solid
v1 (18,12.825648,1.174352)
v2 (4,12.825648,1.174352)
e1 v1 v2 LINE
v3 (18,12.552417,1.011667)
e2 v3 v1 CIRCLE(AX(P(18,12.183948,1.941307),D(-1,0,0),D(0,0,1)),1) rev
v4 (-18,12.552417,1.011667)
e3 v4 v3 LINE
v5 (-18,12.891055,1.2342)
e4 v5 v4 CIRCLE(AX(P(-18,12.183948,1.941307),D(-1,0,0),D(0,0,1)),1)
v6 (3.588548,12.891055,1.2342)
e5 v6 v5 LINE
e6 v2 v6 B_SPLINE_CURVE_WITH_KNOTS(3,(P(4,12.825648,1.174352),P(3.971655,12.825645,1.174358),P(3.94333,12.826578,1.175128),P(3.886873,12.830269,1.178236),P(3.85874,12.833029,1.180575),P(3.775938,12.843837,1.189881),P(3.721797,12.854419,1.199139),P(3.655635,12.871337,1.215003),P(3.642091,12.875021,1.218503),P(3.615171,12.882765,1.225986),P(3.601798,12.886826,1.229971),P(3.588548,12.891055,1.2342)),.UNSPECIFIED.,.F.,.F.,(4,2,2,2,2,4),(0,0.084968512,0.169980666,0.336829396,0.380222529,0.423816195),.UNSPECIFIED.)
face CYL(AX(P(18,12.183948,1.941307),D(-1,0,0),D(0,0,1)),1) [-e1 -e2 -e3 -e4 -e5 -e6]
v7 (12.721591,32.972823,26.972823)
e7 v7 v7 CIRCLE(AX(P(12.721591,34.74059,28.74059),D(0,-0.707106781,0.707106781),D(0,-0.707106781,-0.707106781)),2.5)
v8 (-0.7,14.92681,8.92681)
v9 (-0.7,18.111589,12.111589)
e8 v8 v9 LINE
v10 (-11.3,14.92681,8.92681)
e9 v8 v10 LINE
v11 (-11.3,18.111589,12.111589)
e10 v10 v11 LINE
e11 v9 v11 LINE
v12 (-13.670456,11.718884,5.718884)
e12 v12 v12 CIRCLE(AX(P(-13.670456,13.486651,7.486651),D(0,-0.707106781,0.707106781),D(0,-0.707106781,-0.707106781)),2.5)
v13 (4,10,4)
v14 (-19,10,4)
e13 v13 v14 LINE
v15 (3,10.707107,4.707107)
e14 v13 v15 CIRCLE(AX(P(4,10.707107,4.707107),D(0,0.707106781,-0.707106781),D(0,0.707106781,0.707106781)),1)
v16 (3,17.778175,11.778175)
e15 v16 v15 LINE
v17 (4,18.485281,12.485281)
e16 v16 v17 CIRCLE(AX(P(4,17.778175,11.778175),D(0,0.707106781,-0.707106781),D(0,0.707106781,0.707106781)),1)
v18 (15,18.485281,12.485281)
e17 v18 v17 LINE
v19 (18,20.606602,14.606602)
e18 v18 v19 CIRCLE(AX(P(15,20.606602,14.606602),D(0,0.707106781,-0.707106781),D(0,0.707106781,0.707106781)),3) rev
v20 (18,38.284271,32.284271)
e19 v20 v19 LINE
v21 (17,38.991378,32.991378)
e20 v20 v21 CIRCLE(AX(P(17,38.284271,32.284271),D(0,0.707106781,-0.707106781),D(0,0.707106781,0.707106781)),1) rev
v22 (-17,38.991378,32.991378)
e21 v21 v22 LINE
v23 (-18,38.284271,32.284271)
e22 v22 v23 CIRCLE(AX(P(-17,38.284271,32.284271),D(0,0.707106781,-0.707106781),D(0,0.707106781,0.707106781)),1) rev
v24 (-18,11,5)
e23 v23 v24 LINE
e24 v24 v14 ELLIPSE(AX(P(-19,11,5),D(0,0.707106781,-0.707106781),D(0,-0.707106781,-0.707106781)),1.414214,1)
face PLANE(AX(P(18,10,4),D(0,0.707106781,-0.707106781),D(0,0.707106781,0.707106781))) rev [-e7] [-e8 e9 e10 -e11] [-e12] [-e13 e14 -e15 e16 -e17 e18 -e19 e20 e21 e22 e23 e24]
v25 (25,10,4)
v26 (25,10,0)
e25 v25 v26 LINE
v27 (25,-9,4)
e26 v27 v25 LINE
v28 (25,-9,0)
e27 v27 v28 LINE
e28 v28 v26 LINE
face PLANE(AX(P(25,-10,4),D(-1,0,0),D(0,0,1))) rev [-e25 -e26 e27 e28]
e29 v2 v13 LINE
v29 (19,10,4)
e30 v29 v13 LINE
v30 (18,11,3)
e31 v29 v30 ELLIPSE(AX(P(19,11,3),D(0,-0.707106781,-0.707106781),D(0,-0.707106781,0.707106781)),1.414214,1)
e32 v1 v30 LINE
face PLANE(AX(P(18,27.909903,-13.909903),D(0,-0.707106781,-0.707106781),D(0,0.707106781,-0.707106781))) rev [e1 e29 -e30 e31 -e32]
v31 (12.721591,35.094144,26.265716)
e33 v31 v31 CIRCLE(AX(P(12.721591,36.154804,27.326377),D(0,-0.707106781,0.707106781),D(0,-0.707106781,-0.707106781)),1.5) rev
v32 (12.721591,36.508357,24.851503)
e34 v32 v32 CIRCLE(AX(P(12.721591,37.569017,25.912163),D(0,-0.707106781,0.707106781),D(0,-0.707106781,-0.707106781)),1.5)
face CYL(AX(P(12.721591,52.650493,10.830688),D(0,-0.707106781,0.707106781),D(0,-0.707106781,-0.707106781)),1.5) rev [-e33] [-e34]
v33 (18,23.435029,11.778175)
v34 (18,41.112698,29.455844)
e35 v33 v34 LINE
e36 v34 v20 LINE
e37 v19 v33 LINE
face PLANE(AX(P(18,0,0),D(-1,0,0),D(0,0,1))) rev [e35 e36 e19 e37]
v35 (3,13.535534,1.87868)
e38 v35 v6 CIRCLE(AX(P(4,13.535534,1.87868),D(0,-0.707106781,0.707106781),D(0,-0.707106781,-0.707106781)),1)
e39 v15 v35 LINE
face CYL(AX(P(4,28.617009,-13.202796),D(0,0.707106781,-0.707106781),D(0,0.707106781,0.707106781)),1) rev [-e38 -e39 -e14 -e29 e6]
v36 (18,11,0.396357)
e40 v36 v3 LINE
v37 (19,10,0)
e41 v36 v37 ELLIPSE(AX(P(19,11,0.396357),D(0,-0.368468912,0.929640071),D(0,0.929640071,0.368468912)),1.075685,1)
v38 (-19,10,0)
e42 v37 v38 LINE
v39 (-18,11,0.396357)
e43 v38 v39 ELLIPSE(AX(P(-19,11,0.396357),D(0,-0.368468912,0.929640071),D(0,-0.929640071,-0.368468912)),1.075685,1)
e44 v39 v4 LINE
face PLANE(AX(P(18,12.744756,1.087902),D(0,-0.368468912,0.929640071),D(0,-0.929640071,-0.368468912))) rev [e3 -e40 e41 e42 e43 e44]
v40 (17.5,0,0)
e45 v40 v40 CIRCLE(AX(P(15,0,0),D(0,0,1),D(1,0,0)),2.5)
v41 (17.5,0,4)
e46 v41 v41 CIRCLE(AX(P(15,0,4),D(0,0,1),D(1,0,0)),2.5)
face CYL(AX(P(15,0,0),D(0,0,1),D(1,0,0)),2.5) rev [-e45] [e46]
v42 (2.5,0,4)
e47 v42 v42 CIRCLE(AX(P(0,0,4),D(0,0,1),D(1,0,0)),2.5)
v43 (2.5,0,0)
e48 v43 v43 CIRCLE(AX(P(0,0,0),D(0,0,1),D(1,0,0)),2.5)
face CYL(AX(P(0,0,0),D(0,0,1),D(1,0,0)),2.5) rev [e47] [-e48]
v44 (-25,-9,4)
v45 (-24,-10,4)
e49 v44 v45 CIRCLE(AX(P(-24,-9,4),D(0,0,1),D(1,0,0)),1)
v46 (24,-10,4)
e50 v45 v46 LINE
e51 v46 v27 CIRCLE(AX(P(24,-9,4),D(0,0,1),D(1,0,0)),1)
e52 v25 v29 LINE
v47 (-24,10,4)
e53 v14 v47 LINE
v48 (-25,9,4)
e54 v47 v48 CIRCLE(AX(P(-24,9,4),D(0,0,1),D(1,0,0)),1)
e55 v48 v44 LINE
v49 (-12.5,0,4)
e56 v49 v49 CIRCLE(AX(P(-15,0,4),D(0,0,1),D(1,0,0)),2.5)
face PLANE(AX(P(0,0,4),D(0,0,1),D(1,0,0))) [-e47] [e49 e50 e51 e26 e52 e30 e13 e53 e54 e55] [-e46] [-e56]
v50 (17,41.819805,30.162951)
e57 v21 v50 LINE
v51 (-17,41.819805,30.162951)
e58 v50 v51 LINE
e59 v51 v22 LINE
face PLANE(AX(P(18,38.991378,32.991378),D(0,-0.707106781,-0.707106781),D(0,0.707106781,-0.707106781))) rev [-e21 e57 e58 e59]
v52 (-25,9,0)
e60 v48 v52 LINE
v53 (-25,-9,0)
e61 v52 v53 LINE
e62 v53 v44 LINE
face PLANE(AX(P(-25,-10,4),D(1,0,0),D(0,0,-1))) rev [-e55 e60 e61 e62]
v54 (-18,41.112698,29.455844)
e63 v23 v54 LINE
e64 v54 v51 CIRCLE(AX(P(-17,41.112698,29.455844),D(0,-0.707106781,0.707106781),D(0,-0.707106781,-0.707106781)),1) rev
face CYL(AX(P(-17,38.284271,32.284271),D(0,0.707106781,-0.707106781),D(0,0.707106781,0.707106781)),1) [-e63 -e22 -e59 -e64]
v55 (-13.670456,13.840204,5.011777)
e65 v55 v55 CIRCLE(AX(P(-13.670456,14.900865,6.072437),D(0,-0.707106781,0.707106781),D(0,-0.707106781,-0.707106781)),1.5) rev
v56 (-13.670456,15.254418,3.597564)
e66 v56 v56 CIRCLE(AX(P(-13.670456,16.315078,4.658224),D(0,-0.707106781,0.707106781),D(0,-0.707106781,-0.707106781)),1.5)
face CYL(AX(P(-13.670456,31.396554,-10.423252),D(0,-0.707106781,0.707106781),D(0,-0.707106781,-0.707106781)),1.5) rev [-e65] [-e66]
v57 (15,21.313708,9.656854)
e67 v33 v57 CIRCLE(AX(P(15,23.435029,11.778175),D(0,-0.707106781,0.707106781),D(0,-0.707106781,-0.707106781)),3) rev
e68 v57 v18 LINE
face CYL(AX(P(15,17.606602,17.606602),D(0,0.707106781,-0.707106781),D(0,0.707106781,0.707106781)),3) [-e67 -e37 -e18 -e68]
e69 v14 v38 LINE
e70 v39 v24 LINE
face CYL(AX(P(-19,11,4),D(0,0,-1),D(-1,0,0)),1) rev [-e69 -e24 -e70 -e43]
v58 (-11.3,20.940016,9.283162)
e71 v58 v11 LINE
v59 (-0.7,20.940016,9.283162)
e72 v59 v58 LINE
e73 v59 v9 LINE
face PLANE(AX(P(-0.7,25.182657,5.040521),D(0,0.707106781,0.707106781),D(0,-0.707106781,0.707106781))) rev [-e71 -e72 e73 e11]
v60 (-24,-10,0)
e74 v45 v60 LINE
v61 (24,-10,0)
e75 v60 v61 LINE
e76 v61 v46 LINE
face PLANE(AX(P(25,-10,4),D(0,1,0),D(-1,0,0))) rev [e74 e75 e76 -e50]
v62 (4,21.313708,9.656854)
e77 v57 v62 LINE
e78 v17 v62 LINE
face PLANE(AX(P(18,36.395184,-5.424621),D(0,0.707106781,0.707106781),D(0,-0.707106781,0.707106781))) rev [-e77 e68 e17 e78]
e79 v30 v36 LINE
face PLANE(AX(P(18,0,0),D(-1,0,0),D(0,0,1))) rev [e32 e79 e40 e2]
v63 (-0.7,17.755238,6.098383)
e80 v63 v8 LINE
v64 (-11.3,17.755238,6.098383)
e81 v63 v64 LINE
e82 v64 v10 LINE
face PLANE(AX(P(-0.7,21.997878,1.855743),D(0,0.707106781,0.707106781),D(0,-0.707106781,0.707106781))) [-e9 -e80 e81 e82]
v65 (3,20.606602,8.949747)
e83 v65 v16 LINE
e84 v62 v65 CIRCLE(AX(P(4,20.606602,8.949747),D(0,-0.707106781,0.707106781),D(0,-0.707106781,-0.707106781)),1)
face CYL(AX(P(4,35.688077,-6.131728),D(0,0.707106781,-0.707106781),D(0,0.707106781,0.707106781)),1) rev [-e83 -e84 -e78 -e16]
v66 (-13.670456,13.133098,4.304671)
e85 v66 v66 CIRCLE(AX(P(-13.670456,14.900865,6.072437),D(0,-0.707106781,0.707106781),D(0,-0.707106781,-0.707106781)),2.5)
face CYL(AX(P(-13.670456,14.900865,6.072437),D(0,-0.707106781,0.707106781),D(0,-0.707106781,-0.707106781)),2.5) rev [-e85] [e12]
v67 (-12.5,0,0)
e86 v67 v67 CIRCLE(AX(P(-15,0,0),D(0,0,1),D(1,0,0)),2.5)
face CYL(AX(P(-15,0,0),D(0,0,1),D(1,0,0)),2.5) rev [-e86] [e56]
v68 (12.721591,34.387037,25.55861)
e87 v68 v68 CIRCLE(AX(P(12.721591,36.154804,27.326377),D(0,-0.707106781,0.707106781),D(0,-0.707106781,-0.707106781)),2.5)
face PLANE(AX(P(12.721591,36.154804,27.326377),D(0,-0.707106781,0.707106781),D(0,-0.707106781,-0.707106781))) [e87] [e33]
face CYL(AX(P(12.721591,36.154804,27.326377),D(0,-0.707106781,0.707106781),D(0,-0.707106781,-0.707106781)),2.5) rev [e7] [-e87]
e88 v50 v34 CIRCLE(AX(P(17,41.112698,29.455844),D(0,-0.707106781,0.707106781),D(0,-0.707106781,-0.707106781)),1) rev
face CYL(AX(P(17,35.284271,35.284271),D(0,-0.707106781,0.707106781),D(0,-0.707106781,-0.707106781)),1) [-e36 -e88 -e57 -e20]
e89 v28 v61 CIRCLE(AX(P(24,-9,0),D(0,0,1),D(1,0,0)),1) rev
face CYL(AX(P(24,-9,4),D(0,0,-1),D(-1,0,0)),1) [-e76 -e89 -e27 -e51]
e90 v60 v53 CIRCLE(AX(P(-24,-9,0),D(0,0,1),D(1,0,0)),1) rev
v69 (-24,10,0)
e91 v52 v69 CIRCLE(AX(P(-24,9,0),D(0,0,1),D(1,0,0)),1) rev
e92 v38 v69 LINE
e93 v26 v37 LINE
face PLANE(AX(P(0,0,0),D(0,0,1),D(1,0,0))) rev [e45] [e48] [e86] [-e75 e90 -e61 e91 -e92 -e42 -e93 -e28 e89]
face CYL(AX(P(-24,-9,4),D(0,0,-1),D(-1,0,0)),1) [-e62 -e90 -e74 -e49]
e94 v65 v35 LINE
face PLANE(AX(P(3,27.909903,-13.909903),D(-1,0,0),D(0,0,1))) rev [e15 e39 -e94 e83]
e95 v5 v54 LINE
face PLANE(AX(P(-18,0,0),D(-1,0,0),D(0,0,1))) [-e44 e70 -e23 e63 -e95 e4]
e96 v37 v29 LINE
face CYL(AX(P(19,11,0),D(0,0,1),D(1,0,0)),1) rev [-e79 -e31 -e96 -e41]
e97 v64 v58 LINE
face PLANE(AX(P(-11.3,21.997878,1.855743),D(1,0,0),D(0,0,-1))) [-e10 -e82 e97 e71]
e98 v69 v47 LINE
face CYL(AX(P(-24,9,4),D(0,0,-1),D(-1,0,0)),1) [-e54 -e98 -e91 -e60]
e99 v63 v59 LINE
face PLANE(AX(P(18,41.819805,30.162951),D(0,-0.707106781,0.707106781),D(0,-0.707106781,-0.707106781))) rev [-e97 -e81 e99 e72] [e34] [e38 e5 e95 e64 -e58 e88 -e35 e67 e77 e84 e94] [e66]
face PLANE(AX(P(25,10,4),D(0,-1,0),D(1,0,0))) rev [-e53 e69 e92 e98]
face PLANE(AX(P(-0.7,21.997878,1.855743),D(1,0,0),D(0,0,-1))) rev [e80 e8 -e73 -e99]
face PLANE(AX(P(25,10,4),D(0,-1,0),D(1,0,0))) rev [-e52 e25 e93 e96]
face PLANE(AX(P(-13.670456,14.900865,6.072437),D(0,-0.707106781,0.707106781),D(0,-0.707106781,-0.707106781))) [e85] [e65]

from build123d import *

# Parameters (mm, degrees)
SKETCH_1_W          = 50
SKETCH_1_H          = 20
EXTRUDE_1_DEPTH     = 4
EXTRUDE_2_DEPTH     = 18
SKETCH_5_R          = 1.5
CUT_EXTRUDE_1_DEPTH = 59.543629581
SKETCH_6_W          = 15
SKETCH_6_H          = 12
CUT_EXTRUDE_2_DEPTH = 59.543629581
FILLET_1_R          = 1
FILLET_2_R          = 1
FILLET_3_R          = 1
SKETCH_7_R          = 2.5
CUT_EXTRUDE_3_DEPTH = 2
SKETCH_8_R          = 2.5
CUT_EXTRUDE_4_DEPTH = 57.695644481
SKETCH_9_W          = 10.6
SKETCH_9_H          = 4.503957044
CUT_EXTRUDE_5_DEPTH = 10
FILLET_4_R          = 3


with BuildPart() as part:
    # 草图1 → 凸台-拉伸1 (new body)
    with BuildSketch(Plane.XY):
        Rectangle(SKETCH_1_W, SKETCH_1_H)
    extrude(amount=EXTRUDE_1_DEPTH)

    # 草图4 → 凸台-拉伸2 (add, symmetric)
    with BuildSketch(Plane(origin=(0, 0, 0), x_dir=(0, 0, -1), z_dir=(1, 0, 0))):
        Polygon((-4, 10), (-32.991378029, 38.991378029), (-30.162950904, 41.819805153), (-1.087902103, 12.744756352), (0, 10), align=None)
    extrude(amount=EXTRUDE_2_DEPTH, both=True)

    # 草图5 → 切除-拉伸1 (cut, through all)
    with BuildSketch(Plane(origin=(0, 3, -3), x_dir=(1, 0, 0), z_dir=(0, -0.7071067811865488, 0.7071067811865462))):
        with Locations(Location((12.721590614, 44.887973136, 0), (0, 0, 270))):
            Circle(SKETCH_5_R)
        with Locations(Location((-13.670456314, 14.830364134, 0), (0, 0, 270))):
            Circle(SKETCH_5_R)
    extrude(amount=-CUT_EXTRUDE_1_DEPTH, mode=Mode.SUBTRACT)

    # 草图6 → 切除-拉伸2 (cut, through all)
    with BuildSketch(Plane(origin=(0, 3, -3), x_dir=(1, 0, 0), z_dir=(0, -0.7071067811865488, 0.7071067811865462))):
        with Locations((10.5, 15.899494937)):
            Rectangle(SKETCH_6_W, SKETCH_6_H)
    extrude(amount=-CUT_EXTRUDE_2_DEPTH, mode=Mode.SUBTRACT)

    # 圆角1
    fillet_1_edges = [part.edges().sort_by_distance(p)[0] for p in [
        (3, 11.414213562, 2.585786438),
        (3, 19.899494937, 11.071067812),
    ]]
    fillet(fillet_1_edges, radius=FILLET_1_R)

    # 圆角2
    # the kernel refuses this fillet: 1 mm, written as the material it adds along each edge
    with BuildSketch(Plane(origin=(-18, 10, 0), x_dir=(0, 1, 0), z_dir=(0, 0, 1))) as fillet_2_piece_1_section:
        with BuildLine():
            CenterArc((FILLET_2_R, FILLET_2_R), FILLET_2_R, 180, 90)
            Line((0, FILLET_2_R), (0, 0))
            Line((0, 0), (FILLET_2_R, 0))
        make_face()
    fillet_2_piece_1 = extrude(amount=4, mode=Mode.PRIVATE)
    fillet_2_piece_1 = split(fillet_2_piece_1, bisect_by=Plane(origin=(-18.229103678, 9.132725648, 3.132725648), z_dir=(0, 0.7071067811865489, -0.7071067811865462)), keep=Keep.TOP, mode=Mode.PRIVATE)
    fillet_2_piece_1 = split(fillet_2_piece_1, bisect_by=Plane(origin=(-18.229103678, 10.891700331, 0.353431249), z_dir=(0, -0.36846891223412287, 0.9296400705203075)), keep=Keep.TOP, mode=Mode.PRIVATE)
    add(fillet_2_piece_1)
    with BuildSketch(Plane(origin=(-18, 10, 0), x_dir=(0, 1, 0), z_dir=(0, 0, 1))) as fillet_2_piece_2_section:
        with BuildLine():
            CenterArc((FILLET_2_R, FILLET_2_R), FILLET_2_R, 180, 90)
            Line((0, FILLET_2_R), (0, 0))
            Line((0, 0), (FILLET_2_R, 0))
        make_face()
    fillet_2_piece_2 = extrude(amount=6.5, mode=Mode.PRIVATE)
    fillet_2_piece_2 = split(fillet_2_piece_2, bisect_by=Plane(origin=(-18.106472513, 10.430118052, 4), z_dir=(0, 0, 1)), keep=Keep.TOP, mode=Mode.PRIVATE)
    fillet_2_piece_2 = split(fillet_2_piece_2, bisect_by=Plane(origin=(-18.106472513, 10.322588538, 4.322588538), z_dir=(0, 0.7071067811865489, -0.7071067811865462)), keep=Keep.TOP, mode=Mode.PRIVATE)
    add(fillet_2_piece_2)
    with BuildSketch(Plane(origin=(18, 10, 0), x_dir=(0, 1, 0), z_dir=(0, 0, 1))) as fillet_2_piece_3_section:
        with BuildLine():
            CenterArc((FILLET_2_R, -FILLET_2_R), FILLET_2_R, 90, 90)
            Line((0, -FILLET_2_R), (0, 0))
            Line((0, 0), (FILLET_2_R, 0))
        make_face()
    fillet_2_piece_3 = extrude(amount=4, mode=Mode.PRIVATE)
    fillet_2_piece_3 = split(fillet_2_piece_3, bisect_by=Plane(origin=(18.236725667, 10.843896017, 0.334483697), z_dir=(0, -0.36846891223412287, 0.9296400705203075)), keep=Keep.TOP, mode=Mode.PRIVATE)
    fillet_2_piece_3 = split(fillet_2_piece_3, bisect_by=Plane(origin=(18.236725667, 11.136071068, 2.863928932), z_dir=(0, -0.7071067811865462, -0.7071067811865489)), keep=Keep.TOP, mode=Mode.PRIVATE)
    add(fillet_2_piece_3)
    # the kernel refuses this fillet: 1 mm, written as the material it takes off along each edge
    with BuildSketch(Plane(origin=(-18, 37.223611076, 34.759144982), x_dir=(1, 0, 0), z_dir=(0, 0.7071067811865485, -0.7071067811865467)), Plane(origin=(18, 37.223611076, 34.759144982), x_dir=(0, -0.7071067811865467, -0.7071067811865485), z_dir=(0, 0.7071067811865485, -0.7071067811865467))) as fillet_2_2_piece_1:
        with BuildLine():
            CenterArc((FILLET_2_R, FILLET_2_R), FILLET_2_R, 180, 90)
            Line((0, FILLET_2_R), (0, 0))
            Line((0, 0), (FILLET_2_R, 0))
        make_face()
    extrude(amount=9, mode=Mode.SUBTRACT)
    with BuildSketch(Plane(origin=(-25, 10, -2.5), x_dir=(1, 0, 0), z_dir=(0, 0, 1)), Plane(origin=(25, -10, -2.5), x_dir=(-1, 0, 0), z_dir=(0, 0, 1)), Plane(origin=(-25, -10, -2.5), x_dir=(0, 1, 0), z_dir=(0, 0, 1))) as fillet_2_2_piece_2:
        with BuildLine():
            CenterArc((FILLET_2_R, -FILLET_2_R), FILLET_2_R, 90, 90)
            Line((0, -FILLET_2_R), (0, 0))
            Line((0, 0), (FILLET_2_R, 0))
        make_face()
    extrude(amount=9, mode=Mode.SUBTRACT)

    # 圆角3
    fillet_3_edges = [part.edges().sort_by_distance(p)[0] for p in [
        (0, 12.744756352, 1.087902103),
    ]]
    fillet(fillet_3_edges, radius=FILLET_3_R)

    # 草图7 → 切除-拉伸3 (cut)
    with BuildSketch(Plane(origin=(0, 3, -3), x_dir=(1, 0, 0), z_dir=(0, -0.7071067811865488, 0.7071067811865462))):
        with Locations(Location((12.721590614, 44.887973136, 0), (0, 0, 270))):
            Circle(SKETCH_7_R)
        with Locations(Location((-13.670456314, 14.830364134, 0), (0, 0, 270))):
            Circle(SKETCH_7_R)
    extrude(amount=-CUT_EXTRUDE_3_DEPTH, mode=Mode.SUBTRACT)

    # 草图8 → 切除-拉伸4 (cut, through all)
    with BuildSketch(Plane.XY.offset(4)):
        Circle(SKETCH_8_R)
        with Locations((15, 0)):
            Circle(SKETCH_8_R)
        with Locations((-15, 0)):
            Circle(SKETCH_8_R)
    extrude(amount=-CUT_EXTRUDE_4_DEPTH, mode=Mode.SUBTRACT)

    # 草图9 → 切除-拉伸5 (cut)
    with BuildSketch(Plane(origin=(0, 3, -3), x_dir=(1, 0, 0), z_dir=(0, -0.7071067811865488, 0.7071067811865462))):
        with Locations((-6, 19.119035577)):
            Rectangle(SKETCH_9_W, SKETCH_9_H)
    extrude(amount=-CUT_EXTRUDE_5_DEPTH, mode=Mode.SUBTRACT)

    # 圆角4
    fillet_4_edges = [part.edges().sort_by_distance(p)[0] for p in [
        (18, 19.899494937, 11.071067812),
    ]]
    fillet(fillet_4_edges, radius=FILLET_4_R)


solid = part.part
